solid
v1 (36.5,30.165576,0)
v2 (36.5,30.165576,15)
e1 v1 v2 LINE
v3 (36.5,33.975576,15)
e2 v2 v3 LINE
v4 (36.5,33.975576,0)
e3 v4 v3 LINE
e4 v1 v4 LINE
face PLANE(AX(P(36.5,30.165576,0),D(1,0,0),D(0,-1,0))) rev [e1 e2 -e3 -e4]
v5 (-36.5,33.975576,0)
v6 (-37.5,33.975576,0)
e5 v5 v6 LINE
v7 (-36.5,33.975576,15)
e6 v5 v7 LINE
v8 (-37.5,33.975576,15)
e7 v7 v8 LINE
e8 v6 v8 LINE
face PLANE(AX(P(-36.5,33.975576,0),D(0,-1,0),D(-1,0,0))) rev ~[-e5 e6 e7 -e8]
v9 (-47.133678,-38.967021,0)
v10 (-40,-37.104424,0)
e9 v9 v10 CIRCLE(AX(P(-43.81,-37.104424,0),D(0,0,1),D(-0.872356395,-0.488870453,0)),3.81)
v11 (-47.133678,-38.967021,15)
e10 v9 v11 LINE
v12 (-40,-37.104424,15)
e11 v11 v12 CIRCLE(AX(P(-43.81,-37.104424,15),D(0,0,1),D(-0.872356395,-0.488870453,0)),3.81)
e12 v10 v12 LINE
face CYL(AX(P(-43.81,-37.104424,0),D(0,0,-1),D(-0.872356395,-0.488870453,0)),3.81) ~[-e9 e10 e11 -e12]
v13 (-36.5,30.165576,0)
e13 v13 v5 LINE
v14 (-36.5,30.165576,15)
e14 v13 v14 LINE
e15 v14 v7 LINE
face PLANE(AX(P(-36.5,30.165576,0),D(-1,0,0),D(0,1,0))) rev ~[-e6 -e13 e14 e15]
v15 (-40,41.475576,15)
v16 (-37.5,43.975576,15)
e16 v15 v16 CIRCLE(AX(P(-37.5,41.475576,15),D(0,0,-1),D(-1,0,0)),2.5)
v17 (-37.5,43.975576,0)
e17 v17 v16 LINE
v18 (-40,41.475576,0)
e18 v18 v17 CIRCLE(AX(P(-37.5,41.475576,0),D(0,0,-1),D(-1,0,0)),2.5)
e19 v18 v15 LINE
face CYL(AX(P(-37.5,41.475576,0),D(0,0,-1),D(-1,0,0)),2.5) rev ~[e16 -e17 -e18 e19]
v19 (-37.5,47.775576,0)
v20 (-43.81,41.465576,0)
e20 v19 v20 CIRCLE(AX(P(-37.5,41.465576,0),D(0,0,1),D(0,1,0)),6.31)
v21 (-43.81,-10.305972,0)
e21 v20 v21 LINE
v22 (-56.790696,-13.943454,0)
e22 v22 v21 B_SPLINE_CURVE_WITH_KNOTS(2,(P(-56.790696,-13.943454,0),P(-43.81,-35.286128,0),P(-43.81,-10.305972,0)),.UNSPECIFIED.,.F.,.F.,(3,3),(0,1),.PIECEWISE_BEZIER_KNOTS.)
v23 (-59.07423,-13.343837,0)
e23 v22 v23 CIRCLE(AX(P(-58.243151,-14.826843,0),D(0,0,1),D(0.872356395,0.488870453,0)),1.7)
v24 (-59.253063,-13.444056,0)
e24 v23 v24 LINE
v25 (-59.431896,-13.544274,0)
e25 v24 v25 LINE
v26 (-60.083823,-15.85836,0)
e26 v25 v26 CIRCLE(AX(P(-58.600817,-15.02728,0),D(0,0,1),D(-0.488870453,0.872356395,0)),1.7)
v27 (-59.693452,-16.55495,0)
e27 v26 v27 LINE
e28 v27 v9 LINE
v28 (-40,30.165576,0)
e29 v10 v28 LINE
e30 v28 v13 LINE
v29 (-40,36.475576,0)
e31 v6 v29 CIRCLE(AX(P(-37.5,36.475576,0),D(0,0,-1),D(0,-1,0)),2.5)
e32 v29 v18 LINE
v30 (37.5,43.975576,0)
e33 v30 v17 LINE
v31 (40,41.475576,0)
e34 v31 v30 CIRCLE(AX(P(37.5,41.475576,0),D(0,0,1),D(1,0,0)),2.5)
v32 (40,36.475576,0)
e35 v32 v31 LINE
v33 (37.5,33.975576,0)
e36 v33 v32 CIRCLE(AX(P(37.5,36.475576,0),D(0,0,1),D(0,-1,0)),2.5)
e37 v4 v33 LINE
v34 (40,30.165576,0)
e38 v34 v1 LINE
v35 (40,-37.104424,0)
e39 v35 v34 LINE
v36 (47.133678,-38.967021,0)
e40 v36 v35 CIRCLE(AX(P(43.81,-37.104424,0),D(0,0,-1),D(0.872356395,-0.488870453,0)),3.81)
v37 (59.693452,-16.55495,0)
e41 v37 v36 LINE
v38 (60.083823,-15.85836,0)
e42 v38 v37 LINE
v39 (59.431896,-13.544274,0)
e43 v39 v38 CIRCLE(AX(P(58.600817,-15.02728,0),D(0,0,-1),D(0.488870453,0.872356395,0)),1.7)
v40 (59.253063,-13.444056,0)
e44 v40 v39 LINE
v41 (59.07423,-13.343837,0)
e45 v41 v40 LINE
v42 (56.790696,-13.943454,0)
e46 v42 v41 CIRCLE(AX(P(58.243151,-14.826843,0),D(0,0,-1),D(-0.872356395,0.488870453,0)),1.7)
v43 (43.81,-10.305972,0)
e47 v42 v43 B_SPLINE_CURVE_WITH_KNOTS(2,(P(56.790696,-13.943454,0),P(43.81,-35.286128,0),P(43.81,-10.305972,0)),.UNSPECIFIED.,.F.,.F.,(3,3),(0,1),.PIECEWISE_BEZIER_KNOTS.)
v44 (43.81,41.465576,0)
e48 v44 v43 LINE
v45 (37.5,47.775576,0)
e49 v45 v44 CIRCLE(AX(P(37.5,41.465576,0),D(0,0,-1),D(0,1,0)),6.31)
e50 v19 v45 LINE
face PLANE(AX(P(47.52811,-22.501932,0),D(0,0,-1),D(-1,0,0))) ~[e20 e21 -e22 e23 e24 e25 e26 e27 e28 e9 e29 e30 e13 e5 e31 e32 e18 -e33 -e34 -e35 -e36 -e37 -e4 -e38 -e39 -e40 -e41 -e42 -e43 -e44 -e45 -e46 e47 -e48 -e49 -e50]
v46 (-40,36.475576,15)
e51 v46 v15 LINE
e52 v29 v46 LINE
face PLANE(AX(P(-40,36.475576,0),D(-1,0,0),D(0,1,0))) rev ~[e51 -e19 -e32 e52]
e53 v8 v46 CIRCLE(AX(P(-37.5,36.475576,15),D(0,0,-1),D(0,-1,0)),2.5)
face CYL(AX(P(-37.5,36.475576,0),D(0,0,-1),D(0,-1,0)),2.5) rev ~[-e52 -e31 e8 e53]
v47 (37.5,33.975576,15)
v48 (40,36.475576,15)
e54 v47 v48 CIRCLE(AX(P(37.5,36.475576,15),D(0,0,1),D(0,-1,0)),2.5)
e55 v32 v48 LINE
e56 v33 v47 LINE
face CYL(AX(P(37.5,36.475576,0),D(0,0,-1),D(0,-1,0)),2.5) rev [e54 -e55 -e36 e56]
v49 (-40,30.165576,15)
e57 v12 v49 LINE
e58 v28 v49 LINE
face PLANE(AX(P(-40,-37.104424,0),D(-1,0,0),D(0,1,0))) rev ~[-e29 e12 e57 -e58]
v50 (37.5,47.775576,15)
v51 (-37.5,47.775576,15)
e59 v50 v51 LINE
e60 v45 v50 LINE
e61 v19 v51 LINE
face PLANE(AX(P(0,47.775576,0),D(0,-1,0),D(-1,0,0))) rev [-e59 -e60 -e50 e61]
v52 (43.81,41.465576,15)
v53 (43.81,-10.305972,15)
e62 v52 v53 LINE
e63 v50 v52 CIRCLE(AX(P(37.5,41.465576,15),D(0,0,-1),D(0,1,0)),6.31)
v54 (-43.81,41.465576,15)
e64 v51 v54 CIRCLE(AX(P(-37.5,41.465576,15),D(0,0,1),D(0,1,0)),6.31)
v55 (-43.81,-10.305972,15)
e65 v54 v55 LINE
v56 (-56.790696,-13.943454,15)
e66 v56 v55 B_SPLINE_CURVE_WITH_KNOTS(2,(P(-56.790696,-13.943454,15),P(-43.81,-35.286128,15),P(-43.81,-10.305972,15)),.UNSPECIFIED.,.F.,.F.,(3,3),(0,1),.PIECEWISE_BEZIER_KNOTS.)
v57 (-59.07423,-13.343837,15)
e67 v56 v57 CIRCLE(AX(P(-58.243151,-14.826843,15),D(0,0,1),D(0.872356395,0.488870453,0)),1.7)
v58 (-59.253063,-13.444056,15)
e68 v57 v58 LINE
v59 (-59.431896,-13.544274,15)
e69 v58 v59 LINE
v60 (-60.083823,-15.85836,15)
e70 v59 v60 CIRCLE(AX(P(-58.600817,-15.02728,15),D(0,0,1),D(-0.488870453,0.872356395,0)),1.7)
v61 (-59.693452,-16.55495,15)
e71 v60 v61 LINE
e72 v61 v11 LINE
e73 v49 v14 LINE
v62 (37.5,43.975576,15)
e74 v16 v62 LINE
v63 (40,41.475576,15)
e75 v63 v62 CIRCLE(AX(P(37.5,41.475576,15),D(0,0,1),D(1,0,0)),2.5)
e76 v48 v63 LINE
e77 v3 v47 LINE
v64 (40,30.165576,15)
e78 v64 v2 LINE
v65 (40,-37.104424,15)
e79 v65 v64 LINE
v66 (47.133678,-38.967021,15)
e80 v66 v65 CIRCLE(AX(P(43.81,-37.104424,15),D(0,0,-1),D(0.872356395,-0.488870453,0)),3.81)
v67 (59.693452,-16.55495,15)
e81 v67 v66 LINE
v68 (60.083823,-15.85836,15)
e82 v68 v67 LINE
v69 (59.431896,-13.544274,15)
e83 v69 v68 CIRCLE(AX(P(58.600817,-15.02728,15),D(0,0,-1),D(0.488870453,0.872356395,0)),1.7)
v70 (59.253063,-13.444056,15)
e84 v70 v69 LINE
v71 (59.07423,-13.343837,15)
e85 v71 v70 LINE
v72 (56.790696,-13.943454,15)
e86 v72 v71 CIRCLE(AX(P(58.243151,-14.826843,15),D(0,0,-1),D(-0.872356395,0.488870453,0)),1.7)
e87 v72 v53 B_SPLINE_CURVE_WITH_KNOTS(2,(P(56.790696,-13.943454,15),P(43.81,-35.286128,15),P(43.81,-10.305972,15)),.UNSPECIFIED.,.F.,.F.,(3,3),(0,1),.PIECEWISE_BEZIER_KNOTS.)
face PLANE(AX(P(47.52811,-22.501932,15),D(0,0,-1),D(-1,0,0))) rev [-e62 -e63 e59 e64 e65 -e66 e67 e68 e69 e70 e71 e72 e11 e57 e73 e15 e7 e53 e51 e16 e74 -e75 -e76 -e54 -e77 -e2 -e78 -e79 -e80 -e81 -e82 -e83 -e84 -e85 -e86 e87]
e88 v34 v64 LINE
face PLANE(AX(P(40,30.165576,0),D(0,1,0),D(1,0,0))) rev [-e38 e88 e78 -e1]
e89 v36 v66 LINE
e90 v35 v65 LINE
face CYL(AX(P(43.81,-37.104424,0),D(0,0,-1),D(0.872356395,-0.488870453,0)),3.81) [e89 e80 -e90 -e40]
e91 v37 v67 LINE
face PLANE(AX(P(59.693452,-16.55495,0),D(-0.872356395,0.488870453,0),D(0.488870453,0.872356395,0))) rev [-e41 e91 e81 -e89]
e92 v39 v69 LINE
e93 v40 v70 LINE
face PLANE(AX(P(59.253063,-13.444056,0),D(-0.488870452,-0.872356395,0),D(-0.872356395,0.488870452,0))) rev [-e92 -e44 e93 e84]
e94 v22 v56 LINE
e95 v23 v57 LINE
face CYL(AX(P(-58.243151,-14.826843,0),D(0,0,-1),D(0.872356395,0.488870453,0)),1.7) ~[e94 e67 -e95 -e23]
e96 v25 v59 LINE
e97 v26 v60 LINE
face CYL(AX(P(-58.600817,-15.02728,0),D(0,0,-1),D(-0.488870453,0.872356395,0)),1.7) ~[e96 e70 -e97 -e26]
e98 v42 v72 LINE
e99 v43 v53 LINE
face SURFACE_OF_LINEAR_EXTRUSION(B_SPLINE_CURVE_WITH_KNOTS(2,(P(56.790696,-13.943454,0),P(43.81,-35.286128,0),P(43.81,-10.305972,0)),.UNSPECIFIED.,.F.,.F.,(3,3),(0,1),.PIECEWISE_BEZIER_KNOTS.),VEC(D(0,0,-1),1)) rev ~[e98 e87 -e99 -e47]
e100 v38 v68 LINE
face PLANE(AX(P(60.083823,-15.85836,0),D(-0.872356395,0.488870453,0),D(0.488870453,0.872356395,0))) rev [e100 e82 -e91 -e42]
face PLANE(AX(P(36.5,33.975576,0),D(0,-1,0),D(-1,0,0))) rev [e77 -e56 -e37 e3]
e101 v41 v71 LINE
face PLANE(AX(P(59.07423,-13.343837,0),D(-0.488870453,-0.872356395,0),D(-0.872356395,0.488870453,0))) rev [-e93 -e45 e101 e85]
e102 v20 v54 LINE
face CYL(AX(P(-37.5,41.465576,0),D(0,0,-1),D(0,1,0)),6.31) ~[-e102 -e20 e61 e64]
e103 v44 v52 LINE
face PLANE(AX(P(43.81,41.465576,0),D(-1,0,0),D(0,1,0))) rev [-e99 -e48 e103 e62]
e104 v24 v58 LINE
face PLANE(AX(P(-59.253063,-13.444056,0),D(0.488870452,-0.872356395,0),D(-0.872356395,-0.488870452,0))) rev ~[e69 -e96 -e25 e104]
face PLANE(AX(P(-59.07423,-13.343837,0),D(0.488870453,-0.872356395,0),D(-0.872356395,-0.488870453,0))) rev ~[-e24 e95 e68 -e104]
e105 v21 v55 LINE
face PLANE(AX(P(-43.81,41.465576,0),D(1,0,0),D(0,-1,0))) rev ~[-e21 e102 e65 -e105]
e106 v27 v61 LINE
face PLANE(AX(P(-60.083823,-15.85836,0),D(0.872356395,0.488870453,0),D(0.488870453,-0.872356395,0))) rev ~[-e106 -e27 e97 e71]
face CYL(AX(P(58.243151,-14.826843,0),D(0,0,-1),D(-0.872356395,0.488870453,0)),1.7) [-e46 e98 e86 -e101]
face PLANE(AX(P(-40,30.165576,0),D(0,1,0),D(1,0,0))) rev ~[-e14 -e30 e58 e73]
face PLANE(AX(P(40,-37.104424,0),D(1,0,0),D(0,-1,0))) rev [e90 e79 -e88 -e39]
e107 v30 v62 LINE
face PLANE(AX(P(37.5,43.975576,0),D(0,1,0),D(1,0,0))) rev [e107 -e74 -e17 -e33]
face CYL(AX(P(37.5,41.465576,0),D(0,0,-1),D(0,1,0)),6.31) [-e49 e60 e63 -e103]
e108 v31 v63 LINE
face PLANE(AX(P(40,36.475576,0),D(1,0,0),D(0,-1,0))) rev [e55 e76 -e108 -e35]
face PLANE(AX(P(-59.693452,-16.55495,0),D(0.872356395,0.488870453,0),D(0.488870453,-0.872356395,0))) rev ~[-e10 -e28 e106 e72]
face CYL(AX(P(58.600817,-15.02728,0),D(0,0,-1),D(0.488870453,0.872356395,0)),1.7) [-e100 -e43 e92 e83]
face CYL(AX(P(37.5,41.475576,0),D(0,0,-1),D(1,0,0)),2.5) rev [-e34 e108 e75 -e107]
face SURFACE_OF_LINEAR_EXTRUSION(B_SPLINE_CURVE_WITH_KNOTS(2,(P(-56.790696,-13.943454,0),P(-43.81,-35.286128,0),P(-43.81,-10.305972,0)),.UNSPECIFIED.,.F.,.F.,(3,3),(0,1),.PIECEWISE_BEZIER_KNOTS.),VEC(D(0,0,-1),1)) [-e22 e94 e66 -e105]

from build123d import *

# Parameters (mm, degrees)
F1_DEPTH    = 15
F2_T1_DEPTH = 15


# Not quite as in the source:
# - a fillet or chamfer that OpenCascade refuses, or shapes differently, is made with other operations: its cross-section is extruded or revolved along the edge and cut away or added


with BuildPart() as f1:
    # F0 (on Top) → F1 (new body)
    with BuildSketch(Plane.XY):
        with BuildLine():
            ThreePointArc((-40, 41.475575803), (-39.267766953, 43.243342756), (-37.5, 43.975575803))
            Line((-37.5, 43.975575803), (0, 43.975575803))
            Line((0, 43.975575803), (0, 47.775575803))
            Line((0, 47.775575803), (-37.5, 47.775575803))
            ThreePointArc((-37.5, 47.775575803), (-41.9618437893, 45.9274195923), (-43.81, 41.465575803))
            Line((-43.81, 41.465575803), (-43.81, 36.475575803))
            Line((-43.81, 36.475575803), (-43.81, -27.529513372))
            Line((-43.81, -27.529513372), (-43.81, -37.104424197))
            Line((-43.81, -37.104424197), (-48.4908909885, -28.7516895034))
            Line((-48.4908909885, -28.7516895034), (-56.369773679, -14.6923540142))
            Line((-56.369773679, -14.6923540142), (-56.7601447269, -13.9957631722))
            ThreePointArc((-56.7601447269, -13.9957631722), (-57.782169231, -13.1905372922), (-59.0742303685, -13.3438370694))
            Line((-59.0742303685, -13.3438370694), (-59.2530634296, -13.4440555122))
            Line((-59.2530634296, -13.4440555122), (-59.4318964906, -13.5442739549))
            ThreePointArc((-59.4318964906, -13.5442739549), (-60.2371223706, -14.566298459), (-60.0838225934, -15.8583595965))
            Line((-60.0838225934, -15.8583595965), (-59.6934515455, -16.5549504386))
            Line((-59.6934515455, -16.5549504386), (-47.1336778665, -38.9670206213))
            ThreePointArc((-47.1336778665, -38.9670206213), (-42.8474805641, -40.7908393032), (-40, -37.104424197))
            Line((-40, -37.104424197), (-40, 30.165575803))
            Line((-40, 30.165575803), (-37.5, 30.165575803))
            Line((-37.5, 30.165575803), (-36.5, 30.165575803))
            Line((-36.5, 30.165575803), (-36.5, 33.975575803))
            Line((-36.5, 33.975575803), (-37.5, 33.975575803))
            ThreePointArc((-37.5, 33.975575803), (-39.267766953, 34.7078088501), (-40, 36.475575803))
            Line((-40, 36.475575803), (-40, 41.475575803))
        make_face()
    extrude(amount=F1_DEPTH)

    # F2: fillet of radius 7 on 1 edges, made by hand

    # F2_s2 → F2_t1 (join)
    with BuildSketch(Plane.XY):
        with BuildLine():
            add(Edge.make_bspline(
                [(-56.7906958843, -13.9434544078), (-43.81, -35.286127782), (-43.81, -10.30597221)],
                knots=[0, 0, 0, 1, 1, 1], degree=2, weights=[1, 1, 1]))
            Line((-43.81, -10.30597221), (-43.11, -10.30597221))
            Line((-43.11, -10.30597221), (-43.11, -37.104424197))
            Line((-43.11, -37.104424197), (-44.4206494768, -37.4466335138))
            ThreePointArc((-44.4206494768, -37.4466335138), (-57.3707942037, -14.337972489), (-57.3887654728, -14.3072026276))
            Line((-57.3887654728, -14.3072026276), (-56.7906958843, -13.9434544078))
        make_face()
    extrude(amount=F2_T1_DEPTH)

    # F3: F1 across face


with BuildPart() as f1_1:
    add(f1.part)
    add(f1.part.mirror(Plane(origin=(0, 45.875575803, 7.5), x_dir=(0, 1, 0), z_dir=(1, 0, 0))))


solid = f1_1.part
